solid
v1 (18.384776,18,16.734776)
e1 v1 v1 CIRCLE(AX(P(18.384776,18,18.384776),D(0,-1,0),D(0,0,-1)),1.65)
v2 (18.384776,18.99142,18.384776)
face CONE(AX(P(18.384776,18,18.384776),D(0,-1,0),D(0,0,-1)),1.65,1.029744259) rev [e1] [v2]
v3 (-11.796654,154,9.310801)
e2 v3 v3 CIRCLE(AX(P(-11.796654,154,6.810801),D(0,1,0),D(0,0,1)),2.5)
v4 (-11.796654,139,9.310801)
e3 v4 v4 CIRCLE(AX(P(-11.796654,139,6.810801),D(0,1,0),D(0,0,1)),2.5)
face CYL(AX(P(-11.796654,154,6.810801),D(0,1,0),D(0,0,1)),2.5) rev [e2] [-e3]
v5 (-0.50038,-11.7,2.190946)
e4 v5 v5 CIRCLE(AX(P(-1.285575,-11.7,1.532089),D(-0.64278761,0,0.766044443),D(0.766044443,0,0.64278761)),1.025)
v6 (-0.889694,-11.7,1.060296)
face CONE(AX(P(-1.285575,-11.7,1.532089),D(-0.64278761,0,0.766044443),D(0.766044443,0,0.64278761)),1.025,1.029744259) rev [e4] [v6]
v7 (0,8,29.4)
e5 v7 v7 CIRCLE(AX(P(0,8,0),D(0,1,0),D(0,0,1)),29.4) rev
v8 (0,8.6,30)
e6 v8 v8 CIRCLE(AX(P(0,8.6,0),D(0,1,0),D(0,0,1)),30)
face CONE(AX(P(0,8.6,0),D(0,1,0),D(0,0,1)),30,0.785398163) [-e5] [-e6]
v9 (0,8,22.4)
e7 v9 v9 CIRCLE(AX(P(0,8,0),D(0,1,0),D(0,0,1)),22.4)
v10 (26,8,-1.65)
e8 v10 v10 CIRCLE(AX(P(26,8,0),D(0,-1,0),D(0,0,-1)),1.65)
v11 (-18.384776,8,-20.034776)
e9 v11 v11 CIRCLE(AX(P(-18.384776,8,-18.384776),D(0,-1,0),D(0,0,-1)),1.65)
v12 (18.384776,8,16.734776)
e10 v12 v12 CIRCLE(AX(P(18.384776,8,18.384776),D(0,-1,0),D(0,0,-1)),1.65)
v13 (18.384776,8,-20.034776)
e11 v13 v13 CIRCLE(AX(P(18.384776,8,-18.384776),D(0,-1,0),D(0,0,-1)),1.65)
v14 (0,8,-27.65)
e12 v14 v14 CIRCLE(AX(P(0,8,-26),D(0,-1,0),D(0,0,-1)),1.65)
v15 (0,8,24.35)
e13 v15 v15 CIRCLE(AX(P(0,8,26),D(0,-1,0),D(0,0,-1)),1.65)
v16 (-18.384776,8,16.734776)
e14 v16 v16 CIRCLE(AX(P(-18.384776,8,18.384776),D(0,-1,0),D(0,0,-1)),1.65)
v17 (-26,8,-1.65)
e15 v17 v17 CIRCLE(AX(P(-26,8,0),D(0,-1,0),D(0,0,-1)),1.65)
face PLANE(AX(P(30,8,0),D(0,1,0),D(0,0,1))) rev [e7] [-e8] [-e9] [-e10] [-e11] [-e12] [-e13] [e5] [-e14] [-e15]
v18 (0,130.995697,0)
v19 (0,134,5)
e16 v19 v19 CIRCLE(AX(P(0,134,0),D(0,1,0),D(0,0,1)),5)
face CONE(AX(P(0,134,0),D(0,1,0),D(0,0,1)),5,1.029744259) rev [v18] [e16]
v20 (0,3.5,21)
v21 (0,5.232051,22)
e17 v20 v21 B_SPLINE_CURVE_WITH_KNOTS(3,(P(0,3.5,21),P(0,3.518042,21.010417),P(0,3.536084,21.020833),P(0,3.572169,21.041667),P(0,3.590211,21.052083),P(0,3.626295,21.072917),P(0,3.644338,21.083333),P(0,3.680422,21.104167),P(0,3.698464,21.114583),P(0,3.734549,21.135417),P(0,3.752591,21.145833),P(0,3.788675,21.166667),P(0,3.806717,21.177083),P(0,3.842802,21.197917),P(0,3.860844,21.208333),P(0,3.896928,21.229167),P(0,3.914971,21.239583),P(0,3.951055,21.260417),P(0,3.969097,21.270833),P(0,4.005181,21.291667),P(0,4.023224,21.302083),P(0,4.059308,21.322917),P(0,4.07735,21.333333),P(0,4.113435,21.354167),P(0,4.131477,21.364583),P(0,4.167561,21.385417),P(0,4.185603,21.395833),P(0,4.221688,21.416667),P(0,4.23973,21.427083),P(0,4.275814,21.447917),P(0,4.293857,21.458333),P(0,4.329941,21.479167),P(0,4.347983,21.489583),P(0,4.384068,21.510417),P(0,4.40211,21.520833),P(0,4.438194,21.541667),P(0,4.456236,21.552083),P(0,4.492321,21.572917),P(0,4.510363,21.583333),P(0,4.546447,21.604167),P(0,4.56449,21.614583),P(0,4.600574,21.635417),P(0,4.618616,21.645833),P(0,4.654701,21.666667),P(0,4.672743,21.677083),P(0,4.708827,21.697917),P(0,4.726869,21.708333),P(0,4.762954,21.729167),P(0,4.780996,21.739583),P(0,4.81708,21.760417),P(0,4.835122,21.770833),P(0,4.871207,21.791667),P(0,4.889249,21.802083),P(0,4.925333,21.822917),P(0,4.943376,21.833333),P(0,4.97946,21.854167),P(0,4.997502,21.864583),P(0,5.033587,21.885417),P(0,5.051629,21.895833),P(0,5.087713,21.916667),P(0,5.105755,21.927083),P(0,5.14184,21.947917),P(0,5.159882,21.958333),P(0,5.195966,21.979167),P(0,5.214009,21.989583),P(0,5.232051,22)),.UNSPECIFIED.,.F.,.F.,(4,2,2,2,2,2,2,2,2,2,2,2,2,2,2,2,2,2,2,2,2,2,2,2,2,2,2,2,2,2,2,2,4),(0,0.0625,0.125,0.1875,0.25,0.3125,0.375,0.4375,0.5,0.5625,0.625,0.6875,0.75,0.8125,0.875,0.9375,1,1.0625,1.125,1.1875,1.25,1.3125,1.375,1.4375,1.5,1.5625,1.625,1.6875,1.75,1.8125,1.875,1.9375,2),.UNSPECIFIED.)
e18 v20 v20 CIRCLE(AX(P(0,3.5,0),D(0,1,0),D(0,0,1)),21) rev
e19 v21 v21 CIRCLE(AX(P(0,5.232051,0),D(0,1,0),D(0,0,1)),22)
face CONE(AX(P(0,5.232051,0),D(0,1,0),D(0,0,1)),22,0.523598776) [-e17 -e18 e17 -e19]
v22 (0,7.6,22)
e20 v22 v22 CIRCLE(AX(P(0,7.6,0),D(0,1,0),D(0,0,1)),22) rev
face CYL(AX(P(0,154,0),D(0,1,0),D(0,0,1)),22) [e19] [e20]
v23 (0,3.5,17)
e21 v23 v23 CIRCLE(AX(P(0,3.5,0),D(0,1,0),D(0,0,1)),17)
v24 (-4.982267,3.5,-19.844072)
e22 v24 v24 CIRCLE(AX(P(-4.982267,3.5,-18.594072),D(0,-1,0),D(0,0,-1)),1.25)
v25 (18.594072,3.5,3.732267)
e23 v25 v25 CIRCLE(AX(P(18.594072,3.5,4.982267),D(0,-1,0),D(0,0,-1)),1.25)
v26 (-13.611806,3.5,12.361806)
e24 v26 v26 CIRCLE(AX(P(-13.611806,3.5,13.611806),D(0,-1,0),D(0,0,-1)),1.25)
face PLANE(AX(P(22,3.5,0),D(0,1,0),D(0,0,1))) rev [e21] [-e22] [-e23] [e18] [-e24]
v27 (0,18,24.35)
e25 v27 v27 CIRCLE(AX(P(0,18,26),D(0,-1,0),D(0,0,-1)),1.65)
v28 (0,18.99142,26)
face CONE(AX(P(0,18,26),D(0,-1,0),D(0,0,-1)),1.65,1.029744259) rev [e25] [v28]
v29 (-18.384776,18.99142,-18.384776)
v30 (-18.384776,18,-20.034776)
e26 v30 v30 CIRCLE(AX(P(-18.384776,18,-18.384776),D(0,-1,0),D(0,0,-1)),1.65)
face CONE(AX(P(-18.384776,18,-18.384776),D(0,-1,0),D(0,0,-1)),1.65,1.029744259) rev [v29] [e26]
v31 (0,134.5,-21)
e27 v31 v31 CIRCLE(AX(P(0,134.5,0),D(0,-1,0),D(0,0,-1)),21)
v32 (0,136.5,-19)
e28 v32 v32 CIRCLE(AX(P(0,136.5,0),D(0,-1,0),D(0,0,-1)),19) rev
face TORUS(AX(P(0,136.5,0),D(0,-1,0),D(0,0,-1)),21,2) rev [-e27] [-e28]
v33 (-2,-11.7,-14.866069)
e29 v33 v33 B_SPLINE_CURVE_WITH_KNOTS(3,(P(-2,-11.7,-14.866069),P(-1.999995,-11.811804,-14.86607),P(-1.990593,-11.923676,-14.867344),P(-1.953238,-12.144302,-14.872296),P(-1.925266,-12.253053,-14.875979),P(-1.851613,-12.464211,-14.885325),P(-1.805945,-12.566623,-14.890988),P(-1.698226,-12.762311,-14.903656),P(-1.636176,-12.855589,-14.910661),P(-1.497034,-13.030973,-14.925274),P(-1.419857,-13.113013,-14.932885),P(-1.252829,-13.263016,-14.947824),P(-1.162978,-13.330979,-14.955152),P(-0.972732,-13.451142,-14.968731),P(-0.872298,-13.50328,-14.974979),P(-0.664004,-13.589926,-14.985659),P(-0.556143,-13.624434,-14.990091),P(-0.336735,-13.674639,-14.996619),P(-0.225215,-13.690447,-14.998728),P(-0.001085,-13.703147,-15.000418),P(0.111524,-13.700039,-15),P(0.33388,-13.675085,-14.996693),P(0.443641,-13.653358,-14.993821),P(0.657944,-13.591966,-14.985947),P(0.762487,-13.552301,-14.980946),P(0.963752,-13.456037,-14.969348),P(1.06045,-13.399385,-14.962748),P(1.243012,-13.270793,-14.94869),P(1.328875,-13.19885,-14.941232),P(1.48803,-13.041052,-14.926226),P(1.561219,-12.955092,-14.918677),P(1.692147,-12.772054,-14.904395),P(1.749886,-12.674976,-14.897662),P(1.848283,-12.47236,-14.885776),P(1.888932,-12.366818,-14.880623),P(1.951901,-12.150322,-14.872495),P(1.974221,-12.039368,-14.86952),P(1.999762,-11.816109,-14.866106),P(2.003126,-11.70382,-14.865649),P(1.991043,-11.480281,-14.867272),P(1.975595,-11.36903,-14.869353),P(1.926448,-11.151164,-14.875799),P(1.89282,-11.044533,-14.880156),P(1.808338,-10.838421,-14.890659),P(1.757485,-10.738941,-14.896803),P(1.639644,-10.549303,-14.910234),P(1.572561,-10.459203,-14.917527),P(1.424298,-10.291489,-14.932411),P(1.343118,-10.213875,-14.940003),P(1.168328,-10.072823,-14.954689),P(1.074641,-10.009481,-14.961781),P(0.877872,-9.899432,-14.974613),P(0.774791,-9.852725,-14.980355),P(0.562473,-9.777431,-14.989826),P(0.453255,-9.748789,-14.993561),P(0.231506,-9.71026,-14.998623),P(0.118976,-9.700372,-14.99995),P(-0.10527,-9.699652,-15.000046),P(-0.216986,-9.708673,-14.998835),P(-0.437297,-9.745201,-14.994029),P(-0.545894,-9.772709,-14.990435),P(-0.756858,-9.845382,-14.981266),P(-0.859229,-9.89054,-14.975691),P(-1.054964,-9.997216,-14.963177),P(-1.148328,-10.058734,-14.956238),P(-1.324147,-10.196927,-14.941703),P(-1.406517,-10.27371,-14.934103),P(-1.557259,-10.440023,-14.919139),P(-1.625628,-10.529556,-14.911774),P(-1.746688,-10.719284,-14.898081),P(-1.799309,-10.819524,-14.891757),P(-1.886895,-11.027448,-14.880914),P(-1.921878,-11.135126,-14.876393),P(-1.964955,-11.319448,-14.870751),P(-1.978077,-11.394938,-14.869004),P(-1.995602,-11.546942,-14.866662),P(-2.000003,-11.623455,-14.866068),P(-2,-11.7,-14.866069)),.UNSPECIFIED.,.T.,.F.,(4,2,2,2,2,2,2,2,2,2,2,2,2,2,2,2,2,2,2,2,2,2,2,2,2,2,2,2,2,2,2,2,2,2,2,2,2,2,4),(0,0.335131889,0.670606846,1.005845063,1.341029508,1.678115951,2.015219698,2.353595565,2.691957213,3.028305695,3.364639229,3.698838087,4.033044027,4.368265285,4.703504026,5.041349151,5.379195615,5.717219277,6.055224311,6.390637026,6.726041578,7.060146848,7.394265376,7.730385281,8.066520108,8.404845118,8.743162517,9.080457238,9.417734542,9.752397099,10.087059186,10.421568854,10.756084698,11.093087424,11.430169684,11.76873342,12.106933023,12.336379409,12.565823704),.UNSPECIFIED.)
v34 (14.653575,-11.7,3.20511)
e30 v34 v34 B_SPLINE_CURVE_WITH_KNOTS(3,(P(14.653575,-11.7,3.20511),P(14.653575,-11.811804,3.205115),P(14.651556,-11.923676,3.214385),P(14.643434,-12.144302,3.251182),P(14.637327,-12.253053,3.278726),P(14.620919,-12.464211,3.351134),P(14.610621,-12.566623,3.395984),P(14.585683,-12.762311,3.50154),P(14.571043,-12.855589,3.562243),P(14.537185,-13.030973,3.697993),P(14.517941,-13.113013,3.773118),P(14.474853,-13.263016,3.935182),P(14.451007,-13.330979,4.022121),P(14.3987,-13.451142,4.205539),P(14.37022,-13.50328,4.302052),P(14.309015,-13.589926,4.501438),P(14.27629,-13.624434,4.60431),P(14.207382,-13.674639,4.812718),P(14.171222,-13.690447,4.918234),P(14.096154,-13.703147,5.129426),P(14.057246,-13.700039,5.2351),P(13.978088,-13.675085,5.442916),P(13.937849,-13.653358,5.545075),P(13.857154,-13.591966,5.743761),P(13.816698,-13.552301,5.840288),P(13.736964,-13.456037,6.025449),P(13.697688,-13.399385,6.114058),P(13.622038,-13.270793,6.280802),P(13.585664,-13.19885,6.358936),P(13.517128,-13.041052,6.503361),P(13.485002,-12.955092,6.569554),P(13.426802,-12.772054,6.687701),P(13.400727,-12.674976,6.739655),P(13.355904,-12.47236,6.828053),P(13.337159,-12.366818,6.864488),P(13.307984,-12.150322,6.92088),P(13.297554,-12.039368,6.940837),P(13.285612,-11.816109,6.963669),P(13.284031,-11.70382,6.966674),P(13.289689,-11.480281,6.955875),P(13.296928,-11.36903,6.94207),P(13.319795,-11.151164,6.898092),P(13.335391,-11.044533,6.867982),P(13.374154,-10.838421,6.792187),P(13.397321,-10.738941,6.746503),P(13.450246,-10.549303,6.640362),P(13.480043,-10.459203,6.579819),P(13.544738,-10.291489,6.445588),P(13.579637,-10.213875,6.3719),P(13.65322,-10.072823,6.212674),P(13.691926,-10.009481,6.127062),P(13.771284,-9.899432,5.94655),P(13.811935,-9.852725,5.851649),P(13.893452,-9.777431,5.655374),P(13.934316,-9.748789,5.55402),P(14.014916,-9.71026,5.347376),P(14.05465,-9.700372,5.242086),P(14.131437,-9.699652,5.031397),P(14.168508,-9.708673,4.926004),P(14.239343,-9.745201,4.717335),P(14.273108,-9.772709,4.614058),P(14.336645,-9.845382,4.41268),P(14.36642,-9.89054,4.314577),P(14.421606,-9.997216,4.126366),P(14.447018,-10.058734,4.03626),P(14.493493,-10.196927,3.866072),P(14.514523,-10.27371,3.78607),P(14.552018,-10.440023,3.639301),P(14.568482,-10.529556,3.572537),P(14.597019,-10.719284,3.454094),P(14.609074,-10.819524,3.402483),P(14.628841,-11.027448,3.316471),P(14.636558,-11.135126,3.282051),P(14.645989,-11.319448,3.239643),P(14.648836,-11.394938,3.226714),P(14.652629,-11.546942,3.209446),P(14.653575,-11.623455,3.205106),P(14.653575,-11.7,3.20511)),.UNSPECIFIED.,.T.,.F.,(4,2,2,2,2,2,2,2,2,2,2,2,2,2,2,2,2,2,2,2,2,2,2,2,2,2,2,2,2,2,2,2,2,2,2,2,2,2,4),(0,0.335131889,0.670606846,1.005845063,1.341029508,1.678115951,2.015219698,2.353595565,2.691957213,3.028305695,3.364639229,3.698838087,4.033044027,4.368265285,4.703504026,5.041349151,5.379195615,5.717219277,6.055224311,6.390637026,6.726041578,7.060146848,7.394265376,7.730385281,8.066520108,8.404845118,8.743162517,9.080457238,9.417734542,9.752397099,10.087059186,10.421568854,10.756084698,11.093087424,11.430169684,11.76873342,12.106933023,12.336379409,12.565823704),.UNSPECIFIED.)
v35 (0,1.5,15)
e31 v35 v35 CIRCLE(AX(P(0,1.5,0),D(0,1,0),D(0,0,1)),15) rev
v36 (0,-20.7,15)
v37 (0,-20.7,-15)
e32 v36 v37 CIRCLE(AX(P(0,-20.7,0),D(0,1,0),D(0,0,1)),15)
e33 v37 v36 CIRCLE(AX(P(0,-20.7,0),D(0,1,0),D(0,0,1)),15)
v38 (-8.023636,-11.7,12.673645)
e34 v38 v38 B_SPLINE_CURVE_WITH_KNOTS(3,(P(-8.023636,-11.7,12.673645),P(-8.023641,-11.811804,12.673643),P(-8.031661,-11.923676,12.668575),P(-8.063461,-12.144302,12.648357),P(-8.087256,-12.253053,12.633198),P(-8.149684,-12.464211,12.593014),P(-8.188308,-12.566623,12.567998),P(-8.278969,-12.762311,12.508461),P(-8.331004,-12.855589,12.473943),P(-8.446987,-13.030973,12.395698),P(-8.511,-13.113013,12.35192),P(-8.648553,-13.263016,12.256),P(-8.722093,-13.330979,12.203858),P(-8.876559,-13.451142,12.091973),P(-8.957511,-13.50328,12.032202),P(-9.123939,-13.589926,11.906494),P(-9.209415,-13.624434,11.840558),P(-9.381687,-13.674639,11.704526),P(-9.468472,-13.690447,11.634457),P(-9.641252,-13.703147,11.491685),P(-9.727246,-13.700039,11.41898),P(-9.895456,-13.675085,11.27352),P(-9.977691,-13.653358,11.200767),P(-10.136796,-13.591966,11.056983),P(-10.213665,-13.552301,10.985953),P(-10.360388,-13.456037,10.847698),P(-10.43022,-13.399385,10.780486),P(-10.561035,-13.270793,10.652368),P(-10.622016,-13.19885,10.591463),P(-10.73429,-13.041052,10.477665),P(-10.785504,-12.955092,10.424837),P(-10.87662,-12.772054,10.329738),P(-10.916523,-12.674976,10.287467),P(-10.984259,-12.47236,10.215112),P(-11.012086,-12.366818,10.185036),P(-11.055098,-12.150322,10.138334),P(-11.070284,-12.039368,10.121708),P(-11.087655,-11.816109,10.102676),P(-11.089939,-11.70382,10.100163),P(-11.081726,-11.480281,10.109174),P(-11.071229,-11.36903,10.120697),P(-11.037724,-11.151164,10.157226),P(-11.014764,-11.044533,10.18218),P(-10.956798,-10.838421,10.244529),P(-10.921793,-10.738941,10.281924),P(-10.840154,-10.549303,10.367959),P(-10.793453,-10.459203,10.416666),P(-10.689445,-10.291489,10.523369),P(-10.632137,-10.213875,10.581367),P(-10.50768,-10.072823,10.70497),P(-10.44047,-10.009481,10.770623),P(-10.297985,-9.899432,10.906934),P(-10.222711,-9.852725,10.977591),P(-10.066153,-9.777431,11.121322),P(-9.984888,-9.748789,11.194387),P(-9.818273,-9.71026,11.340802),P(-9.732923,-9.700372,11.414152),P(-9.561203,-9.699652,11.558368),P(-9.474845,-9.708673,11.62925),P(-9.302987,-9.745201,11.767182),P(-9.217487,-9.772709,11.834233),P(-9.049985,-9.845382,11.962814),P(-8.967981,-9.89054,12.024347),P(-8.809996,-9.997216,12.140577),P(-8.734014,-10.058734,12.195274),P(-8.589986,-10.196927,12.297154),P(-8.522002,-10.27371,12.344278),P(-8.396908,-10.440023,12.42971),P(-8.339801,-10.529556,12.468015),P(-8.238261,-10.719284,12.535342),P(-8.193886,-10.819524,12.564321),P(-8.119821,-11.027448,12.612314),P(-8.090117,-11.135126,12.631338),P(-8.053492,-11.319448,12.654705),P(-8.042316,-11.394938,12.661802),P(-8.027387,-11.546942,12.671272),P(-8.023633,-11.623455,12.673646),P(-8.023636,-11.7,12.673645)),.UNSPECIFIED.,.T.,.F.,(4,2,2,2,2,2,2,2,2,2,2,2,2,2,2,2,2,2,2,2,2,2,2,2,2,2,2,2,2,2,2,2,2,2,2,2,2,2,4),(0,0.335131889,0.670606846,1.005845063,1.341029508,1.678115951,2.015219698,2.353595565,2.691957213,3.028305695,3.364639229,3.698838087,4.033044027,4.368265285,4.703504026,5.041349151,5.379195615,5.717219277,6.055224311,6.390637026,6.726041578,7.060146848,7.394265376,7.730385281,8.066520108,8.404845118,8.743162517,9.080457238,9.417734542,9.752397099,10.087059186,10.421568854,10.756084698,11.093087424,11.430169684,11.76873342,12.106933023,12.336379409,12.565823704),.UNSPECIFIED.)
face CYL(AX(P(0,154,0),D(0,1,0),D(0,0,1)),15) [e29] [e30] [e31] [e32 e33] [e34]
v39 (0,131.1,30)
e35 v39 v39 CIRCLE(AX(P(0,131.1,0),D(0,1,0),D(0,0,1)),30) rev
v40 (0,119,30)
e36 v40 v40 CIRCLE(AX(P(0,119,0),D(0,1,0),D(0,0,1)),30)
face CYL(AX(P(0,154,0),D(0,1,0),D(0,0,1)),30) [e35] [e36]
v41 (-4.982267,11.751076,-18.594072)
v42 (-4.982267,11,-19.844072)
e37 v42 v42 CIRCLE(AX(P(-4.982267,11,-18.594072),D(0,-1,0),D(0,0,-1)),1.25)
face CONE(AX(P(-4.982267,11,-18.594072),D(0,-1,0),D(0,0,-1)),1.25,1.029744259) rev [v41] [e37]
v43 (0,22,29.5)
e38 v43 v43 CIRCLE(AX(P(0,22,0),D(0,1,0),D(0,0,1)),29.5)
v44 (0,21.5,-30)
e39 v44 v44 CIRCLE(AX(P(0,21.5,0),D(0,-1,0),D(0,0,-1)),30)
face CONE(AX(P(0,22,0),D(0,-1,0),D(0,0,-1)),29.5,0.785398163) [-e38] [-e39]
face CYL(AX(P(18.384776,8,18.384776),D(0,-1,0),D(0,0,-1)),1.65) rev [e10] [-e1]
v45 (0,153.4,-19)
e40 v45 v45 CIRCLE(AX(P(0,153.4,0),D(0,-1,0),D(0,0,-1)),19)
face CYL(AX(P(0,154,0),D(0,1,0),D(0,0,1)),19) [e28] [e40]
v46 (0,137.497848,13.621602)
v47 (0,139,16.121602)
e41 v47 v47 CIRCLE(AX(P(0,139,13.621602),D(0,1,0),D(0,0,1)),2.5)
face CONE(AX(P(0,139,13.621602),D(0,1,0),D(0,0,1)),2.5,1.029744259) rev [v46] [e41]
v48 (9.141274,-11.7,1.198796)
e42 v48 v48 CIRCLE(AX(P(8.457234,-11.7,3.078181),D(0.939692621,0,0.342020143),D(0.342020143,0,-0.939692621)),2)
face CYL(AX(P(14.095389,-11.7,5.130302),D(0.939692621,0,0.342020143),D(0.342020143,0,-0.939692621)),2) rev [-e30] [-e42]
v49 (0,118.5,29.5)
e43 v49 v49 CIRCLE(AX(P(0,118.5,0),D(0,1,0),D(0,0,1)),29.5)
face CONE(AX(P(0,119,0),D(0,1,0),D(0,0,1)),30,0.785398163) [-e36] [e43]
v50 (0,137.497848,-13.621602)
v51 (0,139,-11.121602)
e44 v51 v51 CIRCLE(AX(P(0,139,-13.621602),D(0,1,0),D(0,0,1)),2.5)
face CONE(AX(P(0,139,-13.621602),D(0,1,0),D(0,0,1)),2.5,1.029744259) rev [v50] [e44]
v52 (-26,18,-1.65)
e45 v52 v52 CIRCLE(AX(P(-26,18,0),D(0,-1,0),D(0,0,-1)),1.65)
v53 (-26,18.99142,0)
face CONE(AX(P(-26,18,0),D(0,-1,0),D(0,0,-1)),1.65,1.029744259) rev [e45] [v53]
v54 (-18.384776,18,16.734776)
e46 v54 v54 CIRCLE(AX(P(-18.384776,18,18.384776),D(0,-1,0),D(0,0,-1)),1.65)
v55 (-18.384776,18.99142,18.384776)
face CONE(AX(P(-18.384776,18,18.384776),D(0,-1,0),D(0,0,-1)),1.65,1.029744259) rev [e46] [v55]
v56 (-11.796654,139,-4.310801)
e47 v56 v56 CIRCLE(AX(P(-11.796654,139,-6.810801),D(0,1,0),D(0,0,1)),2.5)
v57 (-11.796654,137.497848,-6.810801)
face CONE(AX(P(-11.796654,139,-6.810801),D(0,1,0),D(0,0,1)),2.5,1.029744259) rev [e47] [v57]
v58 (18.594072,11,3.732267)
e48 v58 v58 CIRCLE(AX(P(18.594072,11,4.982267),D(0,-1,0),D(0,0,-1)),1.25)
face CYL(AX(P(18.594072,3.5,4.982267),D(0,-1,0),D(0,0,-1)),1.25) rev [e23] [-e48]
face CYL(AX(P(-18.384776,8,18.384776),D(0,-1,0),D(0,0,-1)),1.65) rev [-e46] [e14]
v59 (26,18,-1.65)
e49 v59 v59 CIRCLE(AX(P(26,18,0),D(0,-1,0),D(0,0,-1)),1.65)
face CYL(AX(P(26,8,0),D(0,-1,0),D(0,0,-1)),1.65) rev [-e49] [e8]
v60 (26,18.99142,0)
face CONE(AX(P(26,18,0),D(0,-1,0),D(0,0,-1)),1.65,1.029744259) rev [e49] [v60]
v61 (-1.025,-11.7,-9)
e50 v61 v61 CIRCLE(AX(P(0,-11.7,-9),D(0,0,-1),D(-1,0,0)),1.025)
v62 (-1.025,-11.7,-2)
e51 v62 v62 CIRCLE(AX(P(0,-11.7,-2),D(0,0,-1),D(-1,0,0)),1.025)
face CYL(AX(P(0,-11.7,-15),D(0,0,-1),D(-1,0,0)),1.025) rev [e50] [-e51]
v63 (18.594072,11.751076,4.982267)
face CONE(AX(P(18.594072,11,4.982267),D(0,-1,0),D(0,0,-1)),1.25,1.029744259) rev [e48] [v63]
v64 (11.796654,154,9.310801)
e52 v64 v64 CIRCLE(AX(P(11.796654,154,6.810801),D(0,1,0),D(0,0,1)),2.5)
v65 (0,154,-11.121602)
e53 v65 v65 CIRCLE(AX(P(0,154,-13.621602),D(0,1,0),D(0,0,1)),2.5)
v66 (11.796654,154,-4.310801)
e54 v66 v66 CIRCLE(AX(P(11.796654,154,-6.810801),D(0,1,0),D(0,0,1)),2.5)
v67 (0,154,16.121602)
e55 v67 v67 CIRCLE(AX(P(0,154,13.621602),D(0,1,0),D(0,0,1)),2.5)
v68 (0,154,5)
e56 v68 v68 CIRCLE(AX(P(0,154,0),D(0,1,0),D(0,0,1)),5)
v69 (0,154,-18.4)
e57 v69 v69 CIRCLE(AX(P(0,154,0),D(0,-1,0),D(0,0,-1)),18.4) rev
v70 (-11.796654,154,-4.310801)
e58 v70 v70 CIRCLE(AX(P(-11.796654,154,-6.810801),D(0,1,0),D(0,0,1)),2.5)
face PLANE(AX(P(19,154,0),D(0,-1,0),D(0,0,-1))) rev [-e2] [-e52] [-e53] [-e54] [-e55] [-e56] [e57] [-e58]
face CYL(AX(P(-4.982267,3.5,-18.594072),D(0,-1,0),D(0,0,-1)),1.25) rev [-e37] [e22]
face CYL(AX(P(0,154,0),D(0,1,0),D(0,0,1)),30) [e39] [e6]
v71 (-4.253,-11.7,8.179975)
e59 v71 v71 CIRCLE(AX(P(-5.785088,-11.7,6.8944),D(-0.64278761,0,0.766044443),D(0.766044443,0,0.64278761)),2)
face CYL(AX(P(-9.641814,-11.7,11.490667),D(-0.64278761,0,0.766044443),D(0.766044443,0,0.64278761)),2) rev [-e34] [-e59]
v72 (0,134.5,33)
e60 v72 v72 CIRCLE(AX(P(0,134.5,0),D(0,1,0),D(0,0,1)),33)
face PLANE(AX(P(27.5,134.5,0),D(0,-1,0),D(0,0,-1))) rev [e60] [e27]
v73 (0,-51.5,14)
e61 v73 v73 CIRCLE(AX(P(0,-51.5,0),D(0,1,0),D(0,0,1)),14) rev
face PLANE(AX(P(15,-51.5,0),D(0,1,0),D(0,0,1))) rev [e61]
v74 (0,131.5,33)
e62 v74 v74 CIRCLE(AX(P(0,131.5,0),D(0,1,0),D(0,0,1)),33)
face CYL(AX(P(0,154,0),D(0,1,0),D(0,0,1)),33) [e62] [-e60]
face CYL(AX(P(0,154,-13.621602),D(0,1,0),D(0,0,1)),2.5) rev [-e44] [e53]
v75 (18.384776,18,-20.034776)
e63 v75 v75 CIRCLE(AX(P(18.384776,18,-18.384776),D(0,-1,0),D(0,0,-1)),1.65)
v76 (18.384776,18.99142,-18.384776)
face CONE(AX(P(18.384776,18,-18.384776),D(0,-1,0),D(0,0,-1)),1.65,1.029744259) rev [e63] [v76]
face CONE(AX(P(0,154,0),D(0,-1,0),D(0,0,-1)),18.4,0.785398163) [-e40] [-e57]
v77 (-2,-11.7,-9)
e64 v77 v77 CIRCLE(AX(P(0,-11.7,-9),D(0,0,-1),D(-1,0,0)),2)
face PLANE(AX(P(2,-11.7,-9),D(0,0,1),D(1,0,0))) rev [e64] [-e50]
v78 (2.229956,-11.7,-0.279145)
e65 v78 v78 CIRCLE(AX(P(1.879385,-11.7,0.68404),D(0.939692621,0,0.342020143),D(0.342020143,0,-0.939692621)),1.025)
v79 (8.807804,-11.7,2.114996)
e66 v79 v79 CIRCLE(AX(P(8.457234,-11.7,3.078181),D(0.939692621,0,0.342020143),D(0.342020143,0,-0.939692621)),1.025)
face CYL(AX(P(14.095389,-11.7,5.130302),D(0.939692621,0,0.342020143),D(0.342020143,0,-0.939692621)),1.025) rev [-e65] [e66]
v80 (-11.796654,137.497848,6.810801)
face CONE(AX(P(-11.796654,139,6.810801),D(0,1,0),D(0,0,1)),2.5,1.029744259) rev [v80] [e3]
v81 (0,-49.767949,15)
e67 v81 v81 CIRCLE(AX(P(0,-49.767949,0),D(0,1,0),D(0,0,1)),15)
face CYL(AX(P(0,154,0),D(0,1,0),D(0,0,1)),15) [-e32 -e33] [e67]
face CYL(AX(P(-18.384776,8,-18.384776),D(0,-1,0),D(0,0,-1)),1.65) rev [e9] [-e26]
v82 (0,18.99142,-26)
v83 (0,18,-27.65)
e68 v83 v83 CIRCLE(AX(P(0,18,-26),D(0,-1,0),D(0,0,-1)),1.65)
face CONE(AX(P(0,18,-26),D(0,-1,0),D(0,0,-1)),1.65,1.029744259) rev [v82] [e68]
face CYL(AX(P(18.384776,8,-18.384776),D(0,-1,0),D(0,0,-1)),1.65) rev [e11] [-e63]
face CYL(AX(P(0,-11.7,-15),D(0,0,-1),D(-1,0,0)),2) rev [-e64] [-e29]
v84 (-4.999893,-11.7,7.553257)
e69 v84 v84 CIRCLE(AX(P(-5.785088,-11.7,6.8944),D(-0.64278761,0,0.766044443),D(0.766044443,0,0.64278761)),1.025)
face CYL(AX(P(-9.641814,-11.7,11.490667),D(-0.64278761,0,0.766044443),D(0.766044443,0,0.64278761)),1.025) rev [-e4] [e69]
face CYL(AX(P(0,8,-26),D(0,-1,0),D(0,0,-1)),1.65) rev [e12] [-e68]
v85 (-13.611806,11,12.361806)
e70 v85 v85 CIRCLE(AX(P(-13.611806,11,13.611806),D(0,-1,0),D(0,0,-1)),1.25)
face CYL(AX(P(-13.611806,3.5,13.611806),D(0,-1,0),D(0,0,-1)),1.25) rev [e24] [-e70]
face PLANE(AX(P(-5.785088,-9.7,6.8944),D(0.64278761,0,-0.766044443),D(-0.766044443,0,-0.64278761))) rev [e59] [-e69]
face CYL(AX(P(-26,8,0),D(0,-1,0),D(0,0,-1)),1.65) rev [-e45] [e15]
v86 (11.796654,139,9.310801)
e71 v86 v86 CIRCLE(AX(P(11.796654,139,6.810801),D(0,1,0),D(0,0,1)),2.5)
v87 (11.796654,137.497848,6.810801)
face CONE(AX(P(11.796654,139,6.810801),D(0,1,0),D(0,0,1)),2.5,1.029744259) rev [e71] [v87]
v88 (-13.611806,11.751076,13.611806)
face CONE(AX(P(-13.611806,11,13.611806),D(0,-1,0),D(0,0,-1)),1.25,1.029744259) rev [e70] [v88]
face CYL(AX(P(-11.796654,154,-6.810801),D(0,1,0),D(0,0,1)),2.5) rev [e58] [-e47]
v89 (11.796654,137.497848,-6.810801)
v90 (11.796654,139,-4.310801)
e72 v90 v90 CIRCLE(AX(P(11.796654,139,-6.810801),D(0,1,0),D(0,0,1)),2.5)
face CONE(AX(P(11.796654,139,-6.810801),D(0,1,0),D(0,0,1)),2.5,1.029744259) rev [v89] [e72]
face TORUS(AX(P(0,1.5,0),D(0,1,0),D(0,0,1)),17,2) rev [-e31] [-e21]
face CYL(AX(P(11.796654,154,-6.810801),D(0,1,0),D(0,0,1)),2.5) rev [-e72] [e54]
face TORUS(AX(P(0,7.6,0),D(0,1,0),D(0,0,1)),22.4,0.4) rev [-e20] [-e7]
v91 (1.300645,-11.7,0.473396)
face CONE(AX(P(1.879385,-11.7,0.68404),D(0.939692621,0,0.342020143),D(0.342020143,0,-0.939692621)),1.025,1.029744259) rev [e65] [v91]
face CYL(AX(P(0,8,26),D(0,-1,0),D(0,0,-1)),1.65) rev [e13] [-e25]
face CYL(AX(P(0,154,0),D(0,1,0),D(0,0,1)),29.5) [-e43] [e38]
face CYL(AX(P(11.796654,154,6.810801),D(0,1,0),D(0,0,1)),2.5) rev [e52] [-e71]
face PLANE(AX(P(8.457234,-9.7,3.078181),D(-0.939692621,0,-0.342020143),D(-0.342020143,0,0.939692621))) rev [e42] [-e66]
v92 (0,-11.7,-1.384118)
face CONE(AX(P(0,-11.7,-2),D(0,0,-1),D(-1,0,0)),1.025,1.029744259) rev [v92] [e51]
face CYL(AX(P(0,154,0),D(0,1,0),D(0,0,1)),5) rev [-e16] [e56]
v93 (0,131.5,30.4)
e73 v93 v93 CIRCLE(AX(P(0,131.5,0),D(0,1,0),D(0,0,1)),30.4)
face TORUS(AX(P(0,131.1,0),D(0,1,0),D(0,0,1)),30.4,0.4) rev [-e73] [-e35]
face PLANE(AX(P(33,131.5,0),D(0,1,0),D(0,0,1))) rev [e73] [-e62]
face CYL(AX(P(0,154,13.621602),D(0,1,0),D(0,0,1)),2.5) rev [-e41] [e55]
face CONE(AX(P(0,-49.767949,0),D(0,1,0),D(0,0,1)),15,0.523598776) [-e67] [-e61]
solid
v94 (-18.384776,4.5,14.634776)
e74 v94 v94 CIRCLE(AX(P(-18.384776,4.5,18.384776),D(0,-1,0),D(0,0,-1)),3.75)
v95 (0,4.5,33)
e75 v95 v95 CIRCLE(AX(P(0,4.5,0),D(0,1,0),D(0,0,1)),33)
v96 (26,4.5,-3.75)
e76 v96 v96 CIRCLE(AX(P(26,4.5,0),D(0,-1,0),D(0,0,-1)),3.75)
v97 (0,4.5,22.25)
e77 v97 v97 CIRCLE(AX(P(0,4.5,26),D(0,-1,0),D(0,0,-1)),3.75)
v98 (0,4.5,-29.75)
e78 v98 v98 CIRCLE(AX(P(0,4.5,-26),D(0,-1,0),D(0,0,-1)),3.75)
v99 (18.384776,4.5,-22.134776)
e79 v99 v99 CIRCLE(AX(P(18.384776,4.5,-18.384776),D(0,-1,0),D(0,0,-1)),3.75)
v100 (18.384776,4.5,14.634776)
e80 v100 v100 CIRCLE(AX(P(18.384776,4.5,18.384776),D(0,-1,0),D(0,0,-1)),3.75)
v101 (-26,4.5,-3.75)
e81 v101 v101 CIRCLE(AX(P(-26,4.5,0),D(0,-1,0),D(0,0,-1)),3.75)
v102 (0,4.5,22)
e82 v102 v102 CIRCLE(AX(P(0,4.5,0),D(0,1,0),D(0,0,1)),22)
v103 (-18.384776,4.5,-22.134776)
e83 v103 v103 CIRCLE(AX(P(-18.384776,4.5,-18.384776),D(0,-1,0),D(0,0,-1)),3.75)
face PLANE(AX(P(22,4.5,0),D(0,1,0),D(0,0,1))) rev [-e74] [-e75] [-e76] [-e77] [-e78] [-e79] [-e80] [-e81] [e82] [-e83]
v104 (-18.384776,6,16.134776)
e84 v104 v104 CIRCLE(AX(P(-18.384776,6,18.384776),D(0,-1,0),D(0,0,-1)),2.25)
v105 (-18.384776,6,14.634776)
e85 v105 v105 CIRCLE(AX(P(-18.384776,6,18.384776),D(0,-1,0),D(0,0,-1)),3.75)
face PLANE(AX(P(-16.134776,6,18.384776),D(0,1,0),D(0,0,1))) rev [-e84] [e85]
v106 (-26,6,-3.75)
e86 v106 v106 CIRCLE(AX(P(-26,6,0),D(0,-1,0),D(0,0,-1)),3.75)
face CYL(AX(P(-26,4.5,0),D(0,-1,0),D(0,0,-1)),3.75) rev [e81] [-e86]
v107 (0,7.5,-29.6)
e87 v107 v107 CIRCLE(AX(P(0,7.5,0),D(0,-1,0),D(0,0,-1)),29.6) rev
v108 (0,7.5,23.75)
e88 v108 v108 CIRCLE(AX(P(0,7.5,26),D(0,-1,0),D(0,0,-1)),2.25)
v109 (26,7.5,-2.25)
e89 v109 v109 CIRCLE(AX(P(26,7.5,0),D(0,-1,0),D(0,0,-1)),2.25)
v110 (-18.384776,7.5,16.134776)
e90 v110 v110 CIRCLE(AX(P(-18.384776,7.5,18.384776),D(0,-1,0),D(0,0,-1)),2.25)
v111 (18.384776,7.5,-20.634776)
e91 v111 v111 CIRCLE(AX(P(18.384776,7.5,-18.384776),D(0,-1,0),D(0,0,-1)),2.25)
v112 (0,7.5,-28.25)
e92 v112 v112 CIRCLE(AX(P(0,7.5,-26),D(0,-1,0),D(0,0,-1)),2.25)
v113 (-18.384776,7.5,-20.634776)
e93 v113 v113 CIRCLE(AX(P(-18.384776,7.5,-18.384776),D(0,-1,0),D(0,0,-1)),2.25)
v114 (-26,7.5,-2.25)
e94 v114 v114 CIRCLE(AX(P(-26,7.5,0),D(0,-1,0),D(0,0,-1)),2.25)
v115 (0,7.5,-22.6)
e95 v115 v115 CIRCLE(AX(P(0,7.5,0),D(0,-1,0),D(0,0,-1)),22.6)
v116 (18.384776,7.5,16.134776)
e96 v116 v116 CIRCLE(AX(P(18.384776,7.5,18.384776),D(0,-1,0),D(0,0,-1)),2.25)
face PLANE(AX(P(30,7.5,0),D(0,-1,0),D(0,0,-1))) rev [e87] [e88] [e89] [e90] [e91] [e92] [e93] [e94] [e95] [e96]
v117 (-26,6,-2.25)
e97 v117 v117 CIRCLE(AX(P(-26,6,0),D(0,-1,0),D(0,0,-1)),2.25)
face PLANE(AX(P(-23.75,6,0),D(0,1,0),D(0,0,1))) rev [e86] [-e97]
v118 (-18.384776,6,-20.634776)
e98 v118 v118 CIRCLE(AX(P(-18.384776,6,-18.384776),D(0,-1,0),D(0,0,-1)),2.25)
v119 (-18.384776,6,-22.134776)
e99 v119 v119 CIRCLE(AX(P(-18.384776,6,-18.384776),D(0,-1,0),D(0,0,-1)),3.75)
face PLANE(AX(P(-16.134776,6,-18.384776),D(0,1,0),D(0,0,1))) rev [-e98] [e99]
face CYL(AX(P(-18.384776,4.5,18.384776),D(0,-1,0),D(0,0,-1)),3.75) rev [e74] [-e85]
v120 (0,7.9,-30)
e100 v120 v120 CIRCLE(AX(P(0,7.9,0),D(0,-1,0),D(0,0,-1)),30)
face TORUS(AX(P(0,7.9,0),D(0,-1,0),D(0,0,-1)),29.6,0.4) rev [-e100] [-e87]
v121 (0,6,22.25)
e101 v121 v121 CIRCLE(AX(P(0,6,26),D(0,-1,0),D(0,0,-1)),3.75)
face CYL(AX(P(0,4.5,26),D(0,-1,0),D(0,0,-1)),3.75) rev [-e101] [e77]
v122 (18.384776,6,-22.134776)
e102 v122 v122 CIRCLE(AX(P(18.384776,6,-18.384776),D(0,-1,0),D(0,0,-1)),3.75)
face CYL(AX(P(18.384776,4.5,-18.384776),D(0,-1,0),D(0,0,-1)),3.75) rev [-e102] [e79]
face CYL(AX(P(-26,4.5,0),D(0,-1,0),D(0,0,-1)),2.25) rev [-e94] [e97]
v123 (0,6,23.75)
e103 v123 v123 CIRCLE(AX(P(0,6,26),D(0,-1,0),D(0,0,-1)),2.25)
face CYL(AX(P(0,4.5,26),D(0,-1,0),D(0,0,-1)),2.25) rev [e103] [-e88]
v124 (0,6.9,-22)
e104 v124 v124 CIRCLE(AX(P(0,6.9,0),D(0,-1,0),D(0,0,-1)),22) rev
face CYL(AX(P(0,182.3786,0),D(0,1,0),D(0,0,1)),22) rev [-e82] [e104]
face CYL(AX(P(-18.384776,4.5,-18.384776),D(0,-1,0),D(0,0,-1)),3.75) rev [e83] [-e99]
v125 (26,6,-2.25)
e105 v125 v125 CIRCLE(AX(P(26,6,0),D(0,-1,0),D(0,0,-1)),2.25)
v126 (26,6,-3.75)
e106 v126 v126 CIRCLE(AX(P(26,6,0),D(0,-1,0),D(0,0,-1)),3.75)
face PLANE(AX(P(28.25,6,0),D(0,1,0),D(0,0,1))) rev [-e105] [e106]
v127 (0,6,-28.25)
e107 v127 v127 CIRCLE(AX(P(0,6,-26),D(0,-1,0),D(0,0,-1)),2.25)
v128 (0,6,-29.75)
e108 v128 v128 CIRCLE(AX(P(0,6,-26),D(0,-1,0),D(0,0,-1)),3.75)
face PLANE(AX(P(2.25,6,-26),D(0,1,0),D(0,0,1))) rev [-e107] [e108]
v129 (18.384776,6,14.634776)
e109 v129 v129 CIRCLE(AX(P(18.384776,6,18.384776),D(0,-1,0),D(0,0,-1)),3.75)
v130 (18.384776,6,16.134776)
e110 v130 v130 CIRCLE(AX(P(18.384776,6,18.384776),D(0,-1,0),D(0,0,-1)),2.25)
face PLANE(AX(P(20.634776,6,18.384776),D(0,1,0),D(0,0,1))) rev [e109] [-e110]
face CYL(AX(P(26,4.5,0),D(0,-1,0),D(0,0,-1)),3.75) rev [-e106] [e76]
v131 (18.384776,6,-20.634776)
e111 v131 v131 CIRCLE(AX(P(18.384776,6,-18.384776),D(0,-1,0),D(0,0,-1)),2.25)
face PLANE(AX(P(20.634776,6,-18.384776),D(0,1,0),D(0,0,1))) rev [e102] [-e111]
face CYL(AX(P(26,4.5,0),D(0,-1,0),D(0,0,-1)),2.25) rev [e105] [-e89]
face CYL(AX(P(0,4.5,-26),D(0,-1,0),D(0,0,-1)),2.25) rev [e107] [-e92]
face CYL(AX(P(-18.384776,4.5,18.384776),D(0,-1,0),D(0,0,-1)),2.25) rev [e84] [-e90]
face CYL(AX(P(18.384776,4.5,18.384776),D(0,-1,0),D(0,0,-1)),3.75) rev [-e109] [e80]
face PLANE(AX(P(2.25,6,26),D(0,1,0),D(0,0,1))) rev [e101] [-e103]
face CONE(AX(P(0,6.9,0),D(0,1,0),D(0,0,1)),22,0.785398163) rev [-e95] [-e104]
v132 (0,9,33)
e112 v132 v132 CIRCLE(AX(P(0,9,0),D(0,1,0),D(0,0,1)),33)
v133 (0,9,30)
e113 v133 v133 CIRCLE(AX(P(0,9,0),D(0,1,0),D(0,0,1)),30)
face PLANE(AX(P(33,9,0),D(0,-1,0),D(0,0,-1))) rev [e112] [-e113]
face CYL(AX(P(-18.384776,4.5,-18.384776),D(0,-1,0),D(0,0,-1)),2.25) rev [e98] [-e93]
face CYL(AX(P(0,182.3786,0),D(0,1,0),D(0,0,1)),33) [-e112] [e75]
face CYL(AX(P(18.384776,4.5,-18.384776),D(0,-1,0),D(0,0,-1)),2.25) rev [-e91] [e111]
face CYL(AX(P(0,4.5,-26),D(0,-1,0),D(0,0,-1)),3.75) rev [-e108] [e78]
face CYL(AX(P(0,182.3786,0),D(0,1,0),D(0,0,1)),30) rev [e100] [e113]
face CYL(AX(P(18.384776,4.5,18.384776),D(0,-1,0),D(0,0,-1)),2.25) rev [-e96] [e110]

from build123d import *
from OCP.BRepFilletAPI import BRepFilletAPI_MakeChamfer

# Parameters (mm, degrees)
M6_TAPPED_HOLE1_AT_2_COUNT                   = 2
M6_TAPPED_HOLE1_AT_2_PITCH                   = 13.621602494
M6_TAPPED_HOLE1_AT_3_COUNT                   = 2
M6_TAPPED_HOLE1_AT_3_PITCH                   = 23.593307599
M6_TAPPED_HOLE1_AT_4_COUNT                   = 2
M6_TAPPED_HOLE1_AT_4_PITCH                   = 27.243204987
M6_TAPPED_HOLE1_AT_5_COUNT                   = 2
M6_TAPPED_HOLE1_AT_5_PITCH                   = 23.593307599
M6_TAPPED_HOLE1_AT_6_COUNT                   = 2
M6_TAPPED_HOLE1_AT_6_PITCH                   = 13.621602494
CBORE_FOR_M4_HEX_SOCKET_HEAD_CAP_SCR_2_COUNT = 2
CBORE_FOR_M4_HEX_SOCKET_HEAD_CAP_SCR_2_PITCH = 19.899538483
CBORE_FOR_M4_HEX_SOCKET_HEAD_CAP_SCR_3_COUNT = 2
CBORE_FOR_M4_HEX_SOCKET_HEAD_CAP_SCR_3_PITCH = 36.769552622
CBORE_FOR_M4_HEX_SOCKET_HEAD_CAP_SCR_4_COUNT = 2
CBORE_FOR_M4_HEX_SOCKET_HEAD_CAP_SCR_4_PITCH = 48.041735691
CBORE_FOR_M4_HEX_SOCKET_HEAD_CAP_SCR_5_COUNT = 2
CBORE_FOR_M4_HEX_SOCKET_HEAD_CAP_SCR_5_PITCH = 52
CBORE_FOR_M4_HEX_SOCKET_HEAD_CAP_SCR_6_COUNT = 2
CBORE_FOR_M4_HEX_SOCKET_HEAD_CAP_SCR_6_PITCH = 48.041735691
CBORE_FOR_M4_HEX_SOCKET_HEAD_CAP_SCR_7_COUNT = 2
CBORE_FOR_M4_HEX_SOCKET_HEAD_CAP_SCR_7_PITCH = 36.769552622
CBORE_FOR_M4_HEX_SOCKET_HEAD_CAP_SCR_8_COUNT = 2
CBORE_FOR_M4_HEX_SOCKET_HEAD_CAP_SCR_8_PITCH = 19.899538483
M4_TAPPED_HOLE1_AT_2_COUNT                   = 2
M4_TAPPED_HOLE1_AT_2_PITCH                   = 19.899538483
M4_TAPPED_HOLE1_AT_3_COUNT                   = 2
M4_TAPPED_HOLE1_AT_3_PITCH                   = 36.769552622
M4_TAPPED_HOLE1_AT_4_COUNT                   = 2
M4_TAPPED_HOLE1_AT_4_PITCH                   = 48.041735691
M4_TAPPED_HOLE1_AT_5_COUNT                   = 2
M4_TAPPED_HOLE1_AT_5_PITCH                   = 52
M4_TAPPED_HOLE1_AT_6_COUNT                   = 2
M4_TAPPED_HOLE1_AT_6_PITCH                   = 48.041735691
M4_TAPPED_HOLE1_AT_7_COUNT                   = 2
M4_TAPPED_HOLE1_AT_7_PITCH                   = 36.769552622
M4_TAPPED_HOLE1_AT_8_COUNT                   = 2
M4_TAPPED_HOLE1_AT_8_PITCH                   = 19.899538483
M3_TAPPED_HOLE1_AT_2_COUNT                   = 2
M3_TAPPED_HOLE1_AT_2_PITCH                   = 33.341978046
M3_TAPPED_HOLE1_AT_3_COUNT                   = 2
M3_TAPPED_HOLE1_AT_3_PITCH                   = 33.341978046
SKETCH23_W                                   = 8.5
SKETCH23_H                                   = 4
FILLET3_R                                    = 2
CHAMFER3_SIZE                                = 0.5
MOVE_FACE1_BY                                = 0.5
FILLET2_R                                    = 0.4
CHAMFER2_SIZE                                = 0.6
CHAMFER4_SIZE                                = 0.6
FILLET4_R                                    = 0.4
CHAMFER5_SIZE                                = 1
CHAMFER5_SIZE2                               = 1.732050808


# Read off the part's stored shape, not the designer's step: AdvancedHole3
with BuildPart() as part:
    # Sketch1 → Revolve1 (revolve)
    with BuildSketch(Plane.XY, mode=Mode.PRIVATE) as revolve1_sk:
        Polygon((27.5, 134.5), (27.5, 138.5), (19, 138.5), (19, 154), (0, 154), (0, 134), (0, -51.5), (15, -51.5), (15, 3.5), (22, 3.5), (22, 8), (30, 8), (30, 9), (30, 22), (29.5, 22), (29.5, 118.5), (30, 118.5), (30, 131.5), (33, 131.5), (33, 134.5), align=None)
    revolve(revolve1_sk.sketch.rotate(Axis((0, 154, 0), (0, -1, 0)), 90), axis=Axis((0, 154, 0), (0, -1, 0)))

    # Sketch5 → M6 Tapped Hole1 (revolve, cut)
    with BuildSketch(Plane(origin=(0, 154, -13.621602494), x_dir=(0, 0, 1), z_dir=(1, 0, 0))):
        Polygon((0, 0), (0, 16.502151548), (2.5, 15), (2.5, 0), align=None)
    m6_tapped_hole1 = revolve(axis=Axis((0, 160.35, -13.621602494), (0, -1, 0)), mode=Mode.SUBTRACT)

    # M6 Tapped Hole1 at 2: M6 Tapped Hole1 ×2
    with Locations(*[Vector(0.8660254037844275, 0, 0.5000000000000195) * (i * M6_TAPPED_HOLE1_AT_2_PITCH) for i in range(1, M6_TAPPED_HOLE1_AT_2_COUNT)]):
        add(m6_tapped_hole1, mode=Mode.SUBTRACT)

    # M6 Tapped Hole1 at 3: M6 Tapped Hole1 ×2
    with Locations(*[Vector(0.4999999999999613, 0, 0.866025403784461) * (i * M6_TAPPED_HOLE1_AT_3_PITCH) for i in range(1, M6_TAPPED_HOLE1_AT_3_COUNT)]):
        add(m6_tapped_hole1, mode=Mode.SUBTRACT)

    # M6 Tapped Hole1 at 4: M6 Tapped Hole1 ×2
    with Locations(*[(0, 0, i * M6_TAPPED_HOLE1_AT_4_PITCH) for i in range(1, M6_TAPPED_HOLE1_AT_4_COUNT)]):
        add(m6_tapped_hole1, mode=Mode.SUBTRACT)

    # M6 Tapped Hole1 at 5: M6 Tapped Hole1 ×2
    with Locations(*[Vector(-0.5000000000000775, 0, 0.866025403784394) * (i * M6_TAPPED_HOLE1_AT_5_PITCH) for i in range(1, M6_TAPPED_HOLE1_AT_5_COUNT)]):
        add(m6_tapped_hole1, mode=Mode.SUBTRACT)

    # M6 Tapped Hole1 at 6: M6 Tapped Hole1 ×2
    with Locations(*[Vector(-0.8660254037844947, 0, 0.4999999999999031) * (i * M6_TAPPED_HOLE1_AT_6_PITCH) for i in range(1, M6_TAPPED_HOLE1_AT_6_COUNT)]):
        add(m6_tapped_hole1, mode=Mode.SUBTRACT)

    # Sketch12 → M4 Tapped Hole1 (revolve, cut)
    with BuildSketch(Plane(origin=(-26, 8, 0), x_dir=(0, 0, -1), z_dir=(1, 0, 0))):
        Polygon((0, 0), (0, 10.991420021), (1.65, 10), (1.65, 0), align=None)
    m4_tapped_hole1 = revolve(axis=Axis((-26, 1.65, 0), (0, 1, 0)), mode=Mode.SUBTRACT)

    # M4 Tapped Hole1 at 2: M4 Tapped Hole1 ×2
    with Locations(*[Vector(0.3826834323651611, 0, 0.9238795325112572) * (i * M4_TAPPED_HOLE1_AT_2_PITCH) for i in range(1, M4_TAPPED_HOLE1_AT_2_COUNT)]):
        add(m4_tapped_hole1, mode=Mode.SUBTRACT)

    # M4 Tapped Hole1 at 3: M4 Tapped Hole1 ×2
    with Locations(*[Vector(0.7071067811866131, 0, 0.707106781186482) * (i * M4_TAPPED_HOLE1_AT_3_PITCH) for i in range(1, M4_TAPPED_HOLE1_AT_3_COUNT)]):
        add(m4_tapped_hole1, mode=Mode.SUBTRACT)

    # M4 Tapped Hole1 at 4: M4 Tapped Hole1 ×2
    with Locations(*[Vector(0.9238795325113281, 0, 0.38268343236498986) * (i * M4_TAPPED_HOLE1_AT_4_PITCH) for i in range(1, M4_TAPPED_HOLE1_AT_4_COUNT)]):
        add(m4_tapped_hole1, mode=Mode.SUBTRACT)

    # M4 Tapped Hole1 at 5: M4 Tapped Hole1 ×2
    with Locations(*[(i * M4_TAPPED_HOLE1_AT_5_PITCH, 0, 0) for i in range(1, M4_TAPPED_HOLE1_AT_5_COUNT)]):
        add(m4_tapped_hole1, mode=Mode.SUBTRACT)

    # M4 Tapped Hole1 at 6: M4 Tapped Hole1 ×2
    with Locations(*[Vector(0.9238795325112336, 0, -0.3826834323652182) * (i * M4_TAPPED_HOLE1_AT_6_PITCH) for i in range(1, M4_TAPPED_HOLE1_AT_6_COUNT)]):
        add(m4_tapped_hole1, mode=Mode.SUBTRACT)

    # M4 Tapped Hole1 at 7: M4 Tapped Hole1 ×2
    with Locations(*[Vector(0.7071067811865257, 0, -0.7071067811865693) * (i * M4_TAPPED_HOLE1_AT_7_PITCH) for i in range(1, M4_TAPPED_HOLE1_AT_7_COUNT)]):
        add(m4_tapped_hole1, mode=Mode.SUBTRACT)

    # M4 Tapped Hole1 at 8: M4 Tapped Hole1 ×2
    with Locations(*[Vector(0.38268343236504704, 0, -0.9238795325113045) * (i * M4_TAPPED_HOLE1_AT_8_PITCH) for i in range(1, M4_TAPPED_HOLE1_AT_8_COUNT)]):
        add(m4_tapped_hole1, mode=Mode.SUBTRACT)

    # Sketch21 → M3 Tapped Hole1 (revolve, cut)
    with BuildSketch(Plane(origin=(-4.982266618, 3.5, -18.594072156), x_dir=(0, 0, -1), z_dir=(1, 0, 0))):
        Polygon((0, 0), (0, 8.251075774), (1.25, 7.5), (1.25, 0), align=None)
    m3_tapped_hole1 = revolve(axis=Axis((-4.982266618, -2.85, -18.594072156), (0, 1, 0)), mode=Mode.SUBTRACT)

    # M3 Tapped Hole1 at 2: M3 Tapped Hole1 ×2
    with Locations(*[Vector(0.7071067811865451, 0, 0.70710678118655) * (i * M3_TAPPED_HOLE1_AT_2_PITCH) for i in range(1, M3_TAPPED_HOLE1_AT_2_COUNT)]):
        add(m3_tapped_hole1, mode=Mode.SUBTRACT)

    # M3 Tapped Hole1 at 3: M3 Tapped Hole1 ×2
    with Locations(*[Vector(-0.25881904510252557, 0, 0.965925826289067) * (i * M3_TAPPED_HOLE1_AT_3_PITCH) for i in range(1, M3_TAPPED_HOLE1_AT_3_COUNT)]):
        add(m3_tapped_hole1, mode=Mode.SUBTRACT)

    # Sketch23 → Cut-Revolve1 (revolve, cut)
    with BuildSketch(Plane.XY, mode=Mode.PRIVATE) as cut_revolve1_sk:
        with Locations((23.25, 136.5)):
            Rectangle(SKETCH23_W, SKETCH23_H)
    revolve(cut_revolve1_sk.sketch.rotate(Axis((0, 182.378600127, 0), (0, -1, 0)), 90), axis=Axis((0, 182.378600127, 0), (0, -1, 0)), mode=Mode.SUBTRACT)

    # Sketch29 → Ø10.0mm Dowel Hole1 (revolve, cut)
    with BuildSketch(Plane(origin=(0, 154, 0), x_dir=(0, 0, 1), z_dir=(1, 0, 0))):
        Polygon((0, 0), (0, 23.004303095), (5, 20), (5, 0), align=None)
    revolve(axis=Axis((0, 160.35, 0), (0, -1, 0)), mode=Mode.SUBTRACT)

    # AdvancedHole3 outline → AdvancedHole3 (revolve, cut)
    with BuildSketch(Plane.XZ.offset(11.7)):
        Polygon((2, -15.000019266), (2, -9), (1.025, -9), (1.025, -2), (0, -1.384117865), (0, -15.000019266), align=None)
    revolve(axis=Axis((0, -11.7, 0), (0, 0, 1)), mode=Mode.SUBTRACT)

    # AdvancedHole3 2 outline → AdvancedHole3 2 (revolve, cut)
    with BuildSketch(Plane(origin=(0, -11.7, 0), x_dir=(0, 1, 0), z_dir=(0.34202014332567204, 0, -0.9396926207859072))):
        Polygon((1.025, 9), (2, 9), (2, 15.000019266), (0, 15.000019266), (0, 1.384117865), (1.025, 2), align=None)
    revolve(axis=Axis((0, -11.7, 0), (0.9396926207859072, 0, 0.34202014332567204)), mode=Mode.SUBTRACT)

    # AdvancedHole3 3 outline → AdvancedHole3 3 (revolve, cut)
    with BuildSketch(Plane(origin=(0, -11.7, 0), x_dir=(0.7660444431189728, 0, 0.6427876096865457), z_dir=(0, 1, 0))):
        Polygon((2, -15.000019266), (2, -9), (1.025, -9), (1.025, -2), (0, -1.384117865), (0, -15.000019266), align=None)
    revolve(axis=Axis((0, -11.7, 0), (0.6427876096865457, 0, -0.7660444431189728)), mode=Mode.SUBTRACT)

    # Fillet3
    fillet3_edges = [part.edges().sort_by_distance(p)[0] for p in [
        (0, 134.5, -19),
        (0, 3.5, -15),
    ]]
    fillet(fillet3_edges, radius=FILLET3_R)

    # Chamfer3
    chamfer3_edges = [part.edges().sort_by_distance(p)[0] for p in [
        (0, 22, -30),
        (0, 118.5, -30),
    ]]
    chamfer(chamfer3_edges, length=CHAMFER3_SIZE - 0.0001)  # a hair under: the kernel refuses the full size

    # Chamfer4
    chamfer4_edges = [part.edges().sort_by_distance(p)[0] for p in [
        (0, 154, -19),
        (0, 8, -30),
    ]]
    chamfer(chamfer4_edges, length=CHAMFER4_SIZE)

    # Fillet4
    fillet4_edges = [part.edges().sort_by_distance(p)[0] for p in [
        (0, 131.5, -30),
        (0, 8, -22),
    ]]
    fillet(fillet4_edges, radius=FILLET4_R)

    # Chamfer5: one chamfer whose edges measure the first distance from different faces: ONE call of the kernel's chamfer builder (chamfer() names one face for all edges)
    chamfer5_edges_1 = [part.edges().sort_by_distance(p)[0] for p in [
        (0, -51.5, -15),
    ]]
    chamfer5_side_1 = [part.faces().sort_by_distance(p)[0] for p in [
        (0, -51.5, 0),
    ]]
    chamfer5_edges_2 = [part.edges().sort_by_distance(p)[0] for p in [
        (0, 3.5, -22),
    ]]
    chamfer5_side_2 = [part.faces().sort_by_distance(p)[0] for p in [
        (0, 3.5, -17.622253967),
    ]]
    chamfer5 = BRepFilletAPI_MakeChamfer(part.part.solid().wrapped)
    for e in chamfer5_edges_1:
        chamfer5.Add(CHAMFER5_SIZE, CHAMFER5_SIZE2, e.wrapped, chamfer5_side_1[0].wrapped)  # the first distance lies on this face
    for e in chamfer5_edges_2:
        chamfer5.Add(CHAMFER5_SIZE, CHAMFER5_SIZE2, e.wrapped, chamfer5_side_2[0].wrapped)  # the first distance lies on this face
    add(Compound.cast(chamfer5.Shape()), mode=Mode.REPLACE)


with BuildPart() as body_2:
    # Sketch3 → Revolve2 (revolve)
    with BuildSketch(Plane.XY, mode=Mode.PRIVATE) as revolve2_sk:
        Polygon((22, 8), (22, 4.5), (33, 4.5), (33, 9), (30, 9), (30, 8), align=None)
    revolve(revolve2_sk.sketch.rotate(Axis((0, 182.378600127, 0), (0, -1, 0)), 90), axis=Axis((0, 182.378600127, 0), (0, -1, 0)))

    # Sketch9 → CBORE for M4 Hex Socket Head Cap Screw1 (revolve, cut)
    with BuildSketch(Plane(origin=(18.384776311, 4.5, -18.384776311), x_dir=(0, 0, -1), z_dir=(1, 0, 0))):
        Polygon((0, 0), (0, 3.5), (2.25, 3.5), (2.25, 1.5), (3.75, 1.5), (3.75, 0), align=None)
    cbore_for_m4_hex_socket_head_cap_screw1 = revolve(axis=Axis((18.384776311, -1.85, -18.384776311), (0, 1, 0)), mode=Mode.SUBTRACT)

    # CBORE for M4 Hex Socket Head Cap Scr 2: CBORE for M4 Hex Socket Head Cap Screw1 ×2
    with Locations(*[Vector(-0.9238795325113281, 0, -0.3826834323649901) * (i * CBORE_FOR_M4_HEX_SOCKET_HEAD_CAP_SCR_2_PITCH) for i in range(1, CBORE_FOR_M4_HEX_SOCKET_HEAD_CAP_SCR_2_COUNT)]):
        add(cbore_for_m4_hex_socket_head_cap_screw1, mode=Mode.SUBTRACT)

    # CBORE for M4 Hex Socket Head Cap Scr 3: CBORE for M4 Hex Socket Head Cap Screw1 ×2
    with Locations(*[(-i * CBORE_FOR_M4_HEX_SOCKET_HEAD_CAP_SCR_3_PITCH, 0, 0) for i in range(1, CBORE_FOR_M4_HEX_SOCKET_HEAD_CAP_SCR_3_COUNT)]):
        add(cbore_for_m4_hex_socket_head_cap_screw1, mode=Mode.SUBTRACT)

    # CBORE for M4 Hex Socket Head Cap Scr 4: CBORE for M4 Hex Socket Head Cap Screw1 ×2
    with Locations(*[Vector(-0.9238795325112336, 0, 0.3826834323652182) * (i * CBORE_FOR_M4_HEX_SOCKET_HEAD_CAP_SCR_4_PITCH) for i in range(1, CBORE_FOR_M4_HEX_SOCKET_HEAD_CAP_SCR_4_COUNT)]):
        add(cbore_for_m4_hex_socket_head_cap_screw1, mode=Mode.SUBTRACT)

    # CBORE for M4 Hex Socket Head Cap Scr 5: CBORE for M4 Hex Socket Head Cap Screw1 ×2
    with Locations(*[Vector(-0.7071067811864383, 0, 0.7071067811866567) * (i * CBORE_FOR_M4_HEX_SOCKET_HEAD_CAP_SCR_5_PITCH) for i in range(1, CBORE_FOR_M4_HEX_SOCKET_HEAD_CAP_SCR_5_COUNT)]):
        add(cbore_for_m4_hex_socket_head_cap_screw1, mode=Mode.SUBTRACT)

    # CBORE for M4 Hex Socket Head Cap Scr 6: CBORE for M4 Hex Socket Head Cap Screw1 ×2
    with Locations(*[Vector(-0.3826834323649327, 0, 0.9238795325113518) * (i * CBORE_FOR_M4_HEX_SOCKET_HEAD_CAP_SCR_6_PITCH) for i in range(1, CBORE_FOR_M4_HEX_SOCKET_HEAD_CAP_SCR_6_COUNT)]):
        add(cbore_for_m4_hex_socket_head_cap_screw1, mode=Mode.SUBTRACT)

    # CBORE for M4 Hex Socket Head Cap Scr 7: CBORE for M4 Hex Socket Head Cap Screw1 ×2
    with Locations(*[(0, 0, i * CBORE_FOR_M4_HEX_SOCKET_HEAD_CAP_SCR_7_PITCH) for i in range(1, CBORE_FOR_M4_HEX_SOCKET_HEAD_CAP_SCR_7_COUNT)]):
        add(cbore_for_m4_hex_socket_head_cap_screw1, mode=Mode.SUBTRACT)

    # CBORE for M4 Hex Socket Head Cap Scr 8: CBORE for M4 Hex Socket Head Cap Screw1 ×2
    with Locations(*[Vector(0.38268343236527536, 0, 0.9238795325112099) * (i * CBORE_FOR_M4_HEX_SOCKET_HEAD_CAP_SCR_8_PITCH) for i in range(1, CBORE_FOR_M4_HEX_SOCKET_HEAD_CAP_SCR_8_COUNT)]):
        add(cbore_for_m4_hex_socket_head_cap_screw1, mode=Mode.SUBTRACT)

    # Move Face1: a face moved inward by 0.5
    extrude(body_2.faces().sort_by_distance((24, 8, -15))[0], amount=MOVE_FACE1_BY, dir=(0, -1, 0), mode=Mode.SUBTRACT)

    # Fillet2
    fillet2_edges = [body_2.edges().sort_by_distance(p)[0] for p in [
        (0, 7.5, -30),
    ]]
    fillet(fillet2_edges, radius=FILLET2_R)

    # Chamfer2
    chamfer2_edges = [body_2.edges().sort_by_distance(p)[0] for p in [
        (0, 7.5, -22),
    ]]
    chamfer(chamfer2_edges, length=CHAMFER2_SIZE)


solid = Compound([part.part, body_2.part])
